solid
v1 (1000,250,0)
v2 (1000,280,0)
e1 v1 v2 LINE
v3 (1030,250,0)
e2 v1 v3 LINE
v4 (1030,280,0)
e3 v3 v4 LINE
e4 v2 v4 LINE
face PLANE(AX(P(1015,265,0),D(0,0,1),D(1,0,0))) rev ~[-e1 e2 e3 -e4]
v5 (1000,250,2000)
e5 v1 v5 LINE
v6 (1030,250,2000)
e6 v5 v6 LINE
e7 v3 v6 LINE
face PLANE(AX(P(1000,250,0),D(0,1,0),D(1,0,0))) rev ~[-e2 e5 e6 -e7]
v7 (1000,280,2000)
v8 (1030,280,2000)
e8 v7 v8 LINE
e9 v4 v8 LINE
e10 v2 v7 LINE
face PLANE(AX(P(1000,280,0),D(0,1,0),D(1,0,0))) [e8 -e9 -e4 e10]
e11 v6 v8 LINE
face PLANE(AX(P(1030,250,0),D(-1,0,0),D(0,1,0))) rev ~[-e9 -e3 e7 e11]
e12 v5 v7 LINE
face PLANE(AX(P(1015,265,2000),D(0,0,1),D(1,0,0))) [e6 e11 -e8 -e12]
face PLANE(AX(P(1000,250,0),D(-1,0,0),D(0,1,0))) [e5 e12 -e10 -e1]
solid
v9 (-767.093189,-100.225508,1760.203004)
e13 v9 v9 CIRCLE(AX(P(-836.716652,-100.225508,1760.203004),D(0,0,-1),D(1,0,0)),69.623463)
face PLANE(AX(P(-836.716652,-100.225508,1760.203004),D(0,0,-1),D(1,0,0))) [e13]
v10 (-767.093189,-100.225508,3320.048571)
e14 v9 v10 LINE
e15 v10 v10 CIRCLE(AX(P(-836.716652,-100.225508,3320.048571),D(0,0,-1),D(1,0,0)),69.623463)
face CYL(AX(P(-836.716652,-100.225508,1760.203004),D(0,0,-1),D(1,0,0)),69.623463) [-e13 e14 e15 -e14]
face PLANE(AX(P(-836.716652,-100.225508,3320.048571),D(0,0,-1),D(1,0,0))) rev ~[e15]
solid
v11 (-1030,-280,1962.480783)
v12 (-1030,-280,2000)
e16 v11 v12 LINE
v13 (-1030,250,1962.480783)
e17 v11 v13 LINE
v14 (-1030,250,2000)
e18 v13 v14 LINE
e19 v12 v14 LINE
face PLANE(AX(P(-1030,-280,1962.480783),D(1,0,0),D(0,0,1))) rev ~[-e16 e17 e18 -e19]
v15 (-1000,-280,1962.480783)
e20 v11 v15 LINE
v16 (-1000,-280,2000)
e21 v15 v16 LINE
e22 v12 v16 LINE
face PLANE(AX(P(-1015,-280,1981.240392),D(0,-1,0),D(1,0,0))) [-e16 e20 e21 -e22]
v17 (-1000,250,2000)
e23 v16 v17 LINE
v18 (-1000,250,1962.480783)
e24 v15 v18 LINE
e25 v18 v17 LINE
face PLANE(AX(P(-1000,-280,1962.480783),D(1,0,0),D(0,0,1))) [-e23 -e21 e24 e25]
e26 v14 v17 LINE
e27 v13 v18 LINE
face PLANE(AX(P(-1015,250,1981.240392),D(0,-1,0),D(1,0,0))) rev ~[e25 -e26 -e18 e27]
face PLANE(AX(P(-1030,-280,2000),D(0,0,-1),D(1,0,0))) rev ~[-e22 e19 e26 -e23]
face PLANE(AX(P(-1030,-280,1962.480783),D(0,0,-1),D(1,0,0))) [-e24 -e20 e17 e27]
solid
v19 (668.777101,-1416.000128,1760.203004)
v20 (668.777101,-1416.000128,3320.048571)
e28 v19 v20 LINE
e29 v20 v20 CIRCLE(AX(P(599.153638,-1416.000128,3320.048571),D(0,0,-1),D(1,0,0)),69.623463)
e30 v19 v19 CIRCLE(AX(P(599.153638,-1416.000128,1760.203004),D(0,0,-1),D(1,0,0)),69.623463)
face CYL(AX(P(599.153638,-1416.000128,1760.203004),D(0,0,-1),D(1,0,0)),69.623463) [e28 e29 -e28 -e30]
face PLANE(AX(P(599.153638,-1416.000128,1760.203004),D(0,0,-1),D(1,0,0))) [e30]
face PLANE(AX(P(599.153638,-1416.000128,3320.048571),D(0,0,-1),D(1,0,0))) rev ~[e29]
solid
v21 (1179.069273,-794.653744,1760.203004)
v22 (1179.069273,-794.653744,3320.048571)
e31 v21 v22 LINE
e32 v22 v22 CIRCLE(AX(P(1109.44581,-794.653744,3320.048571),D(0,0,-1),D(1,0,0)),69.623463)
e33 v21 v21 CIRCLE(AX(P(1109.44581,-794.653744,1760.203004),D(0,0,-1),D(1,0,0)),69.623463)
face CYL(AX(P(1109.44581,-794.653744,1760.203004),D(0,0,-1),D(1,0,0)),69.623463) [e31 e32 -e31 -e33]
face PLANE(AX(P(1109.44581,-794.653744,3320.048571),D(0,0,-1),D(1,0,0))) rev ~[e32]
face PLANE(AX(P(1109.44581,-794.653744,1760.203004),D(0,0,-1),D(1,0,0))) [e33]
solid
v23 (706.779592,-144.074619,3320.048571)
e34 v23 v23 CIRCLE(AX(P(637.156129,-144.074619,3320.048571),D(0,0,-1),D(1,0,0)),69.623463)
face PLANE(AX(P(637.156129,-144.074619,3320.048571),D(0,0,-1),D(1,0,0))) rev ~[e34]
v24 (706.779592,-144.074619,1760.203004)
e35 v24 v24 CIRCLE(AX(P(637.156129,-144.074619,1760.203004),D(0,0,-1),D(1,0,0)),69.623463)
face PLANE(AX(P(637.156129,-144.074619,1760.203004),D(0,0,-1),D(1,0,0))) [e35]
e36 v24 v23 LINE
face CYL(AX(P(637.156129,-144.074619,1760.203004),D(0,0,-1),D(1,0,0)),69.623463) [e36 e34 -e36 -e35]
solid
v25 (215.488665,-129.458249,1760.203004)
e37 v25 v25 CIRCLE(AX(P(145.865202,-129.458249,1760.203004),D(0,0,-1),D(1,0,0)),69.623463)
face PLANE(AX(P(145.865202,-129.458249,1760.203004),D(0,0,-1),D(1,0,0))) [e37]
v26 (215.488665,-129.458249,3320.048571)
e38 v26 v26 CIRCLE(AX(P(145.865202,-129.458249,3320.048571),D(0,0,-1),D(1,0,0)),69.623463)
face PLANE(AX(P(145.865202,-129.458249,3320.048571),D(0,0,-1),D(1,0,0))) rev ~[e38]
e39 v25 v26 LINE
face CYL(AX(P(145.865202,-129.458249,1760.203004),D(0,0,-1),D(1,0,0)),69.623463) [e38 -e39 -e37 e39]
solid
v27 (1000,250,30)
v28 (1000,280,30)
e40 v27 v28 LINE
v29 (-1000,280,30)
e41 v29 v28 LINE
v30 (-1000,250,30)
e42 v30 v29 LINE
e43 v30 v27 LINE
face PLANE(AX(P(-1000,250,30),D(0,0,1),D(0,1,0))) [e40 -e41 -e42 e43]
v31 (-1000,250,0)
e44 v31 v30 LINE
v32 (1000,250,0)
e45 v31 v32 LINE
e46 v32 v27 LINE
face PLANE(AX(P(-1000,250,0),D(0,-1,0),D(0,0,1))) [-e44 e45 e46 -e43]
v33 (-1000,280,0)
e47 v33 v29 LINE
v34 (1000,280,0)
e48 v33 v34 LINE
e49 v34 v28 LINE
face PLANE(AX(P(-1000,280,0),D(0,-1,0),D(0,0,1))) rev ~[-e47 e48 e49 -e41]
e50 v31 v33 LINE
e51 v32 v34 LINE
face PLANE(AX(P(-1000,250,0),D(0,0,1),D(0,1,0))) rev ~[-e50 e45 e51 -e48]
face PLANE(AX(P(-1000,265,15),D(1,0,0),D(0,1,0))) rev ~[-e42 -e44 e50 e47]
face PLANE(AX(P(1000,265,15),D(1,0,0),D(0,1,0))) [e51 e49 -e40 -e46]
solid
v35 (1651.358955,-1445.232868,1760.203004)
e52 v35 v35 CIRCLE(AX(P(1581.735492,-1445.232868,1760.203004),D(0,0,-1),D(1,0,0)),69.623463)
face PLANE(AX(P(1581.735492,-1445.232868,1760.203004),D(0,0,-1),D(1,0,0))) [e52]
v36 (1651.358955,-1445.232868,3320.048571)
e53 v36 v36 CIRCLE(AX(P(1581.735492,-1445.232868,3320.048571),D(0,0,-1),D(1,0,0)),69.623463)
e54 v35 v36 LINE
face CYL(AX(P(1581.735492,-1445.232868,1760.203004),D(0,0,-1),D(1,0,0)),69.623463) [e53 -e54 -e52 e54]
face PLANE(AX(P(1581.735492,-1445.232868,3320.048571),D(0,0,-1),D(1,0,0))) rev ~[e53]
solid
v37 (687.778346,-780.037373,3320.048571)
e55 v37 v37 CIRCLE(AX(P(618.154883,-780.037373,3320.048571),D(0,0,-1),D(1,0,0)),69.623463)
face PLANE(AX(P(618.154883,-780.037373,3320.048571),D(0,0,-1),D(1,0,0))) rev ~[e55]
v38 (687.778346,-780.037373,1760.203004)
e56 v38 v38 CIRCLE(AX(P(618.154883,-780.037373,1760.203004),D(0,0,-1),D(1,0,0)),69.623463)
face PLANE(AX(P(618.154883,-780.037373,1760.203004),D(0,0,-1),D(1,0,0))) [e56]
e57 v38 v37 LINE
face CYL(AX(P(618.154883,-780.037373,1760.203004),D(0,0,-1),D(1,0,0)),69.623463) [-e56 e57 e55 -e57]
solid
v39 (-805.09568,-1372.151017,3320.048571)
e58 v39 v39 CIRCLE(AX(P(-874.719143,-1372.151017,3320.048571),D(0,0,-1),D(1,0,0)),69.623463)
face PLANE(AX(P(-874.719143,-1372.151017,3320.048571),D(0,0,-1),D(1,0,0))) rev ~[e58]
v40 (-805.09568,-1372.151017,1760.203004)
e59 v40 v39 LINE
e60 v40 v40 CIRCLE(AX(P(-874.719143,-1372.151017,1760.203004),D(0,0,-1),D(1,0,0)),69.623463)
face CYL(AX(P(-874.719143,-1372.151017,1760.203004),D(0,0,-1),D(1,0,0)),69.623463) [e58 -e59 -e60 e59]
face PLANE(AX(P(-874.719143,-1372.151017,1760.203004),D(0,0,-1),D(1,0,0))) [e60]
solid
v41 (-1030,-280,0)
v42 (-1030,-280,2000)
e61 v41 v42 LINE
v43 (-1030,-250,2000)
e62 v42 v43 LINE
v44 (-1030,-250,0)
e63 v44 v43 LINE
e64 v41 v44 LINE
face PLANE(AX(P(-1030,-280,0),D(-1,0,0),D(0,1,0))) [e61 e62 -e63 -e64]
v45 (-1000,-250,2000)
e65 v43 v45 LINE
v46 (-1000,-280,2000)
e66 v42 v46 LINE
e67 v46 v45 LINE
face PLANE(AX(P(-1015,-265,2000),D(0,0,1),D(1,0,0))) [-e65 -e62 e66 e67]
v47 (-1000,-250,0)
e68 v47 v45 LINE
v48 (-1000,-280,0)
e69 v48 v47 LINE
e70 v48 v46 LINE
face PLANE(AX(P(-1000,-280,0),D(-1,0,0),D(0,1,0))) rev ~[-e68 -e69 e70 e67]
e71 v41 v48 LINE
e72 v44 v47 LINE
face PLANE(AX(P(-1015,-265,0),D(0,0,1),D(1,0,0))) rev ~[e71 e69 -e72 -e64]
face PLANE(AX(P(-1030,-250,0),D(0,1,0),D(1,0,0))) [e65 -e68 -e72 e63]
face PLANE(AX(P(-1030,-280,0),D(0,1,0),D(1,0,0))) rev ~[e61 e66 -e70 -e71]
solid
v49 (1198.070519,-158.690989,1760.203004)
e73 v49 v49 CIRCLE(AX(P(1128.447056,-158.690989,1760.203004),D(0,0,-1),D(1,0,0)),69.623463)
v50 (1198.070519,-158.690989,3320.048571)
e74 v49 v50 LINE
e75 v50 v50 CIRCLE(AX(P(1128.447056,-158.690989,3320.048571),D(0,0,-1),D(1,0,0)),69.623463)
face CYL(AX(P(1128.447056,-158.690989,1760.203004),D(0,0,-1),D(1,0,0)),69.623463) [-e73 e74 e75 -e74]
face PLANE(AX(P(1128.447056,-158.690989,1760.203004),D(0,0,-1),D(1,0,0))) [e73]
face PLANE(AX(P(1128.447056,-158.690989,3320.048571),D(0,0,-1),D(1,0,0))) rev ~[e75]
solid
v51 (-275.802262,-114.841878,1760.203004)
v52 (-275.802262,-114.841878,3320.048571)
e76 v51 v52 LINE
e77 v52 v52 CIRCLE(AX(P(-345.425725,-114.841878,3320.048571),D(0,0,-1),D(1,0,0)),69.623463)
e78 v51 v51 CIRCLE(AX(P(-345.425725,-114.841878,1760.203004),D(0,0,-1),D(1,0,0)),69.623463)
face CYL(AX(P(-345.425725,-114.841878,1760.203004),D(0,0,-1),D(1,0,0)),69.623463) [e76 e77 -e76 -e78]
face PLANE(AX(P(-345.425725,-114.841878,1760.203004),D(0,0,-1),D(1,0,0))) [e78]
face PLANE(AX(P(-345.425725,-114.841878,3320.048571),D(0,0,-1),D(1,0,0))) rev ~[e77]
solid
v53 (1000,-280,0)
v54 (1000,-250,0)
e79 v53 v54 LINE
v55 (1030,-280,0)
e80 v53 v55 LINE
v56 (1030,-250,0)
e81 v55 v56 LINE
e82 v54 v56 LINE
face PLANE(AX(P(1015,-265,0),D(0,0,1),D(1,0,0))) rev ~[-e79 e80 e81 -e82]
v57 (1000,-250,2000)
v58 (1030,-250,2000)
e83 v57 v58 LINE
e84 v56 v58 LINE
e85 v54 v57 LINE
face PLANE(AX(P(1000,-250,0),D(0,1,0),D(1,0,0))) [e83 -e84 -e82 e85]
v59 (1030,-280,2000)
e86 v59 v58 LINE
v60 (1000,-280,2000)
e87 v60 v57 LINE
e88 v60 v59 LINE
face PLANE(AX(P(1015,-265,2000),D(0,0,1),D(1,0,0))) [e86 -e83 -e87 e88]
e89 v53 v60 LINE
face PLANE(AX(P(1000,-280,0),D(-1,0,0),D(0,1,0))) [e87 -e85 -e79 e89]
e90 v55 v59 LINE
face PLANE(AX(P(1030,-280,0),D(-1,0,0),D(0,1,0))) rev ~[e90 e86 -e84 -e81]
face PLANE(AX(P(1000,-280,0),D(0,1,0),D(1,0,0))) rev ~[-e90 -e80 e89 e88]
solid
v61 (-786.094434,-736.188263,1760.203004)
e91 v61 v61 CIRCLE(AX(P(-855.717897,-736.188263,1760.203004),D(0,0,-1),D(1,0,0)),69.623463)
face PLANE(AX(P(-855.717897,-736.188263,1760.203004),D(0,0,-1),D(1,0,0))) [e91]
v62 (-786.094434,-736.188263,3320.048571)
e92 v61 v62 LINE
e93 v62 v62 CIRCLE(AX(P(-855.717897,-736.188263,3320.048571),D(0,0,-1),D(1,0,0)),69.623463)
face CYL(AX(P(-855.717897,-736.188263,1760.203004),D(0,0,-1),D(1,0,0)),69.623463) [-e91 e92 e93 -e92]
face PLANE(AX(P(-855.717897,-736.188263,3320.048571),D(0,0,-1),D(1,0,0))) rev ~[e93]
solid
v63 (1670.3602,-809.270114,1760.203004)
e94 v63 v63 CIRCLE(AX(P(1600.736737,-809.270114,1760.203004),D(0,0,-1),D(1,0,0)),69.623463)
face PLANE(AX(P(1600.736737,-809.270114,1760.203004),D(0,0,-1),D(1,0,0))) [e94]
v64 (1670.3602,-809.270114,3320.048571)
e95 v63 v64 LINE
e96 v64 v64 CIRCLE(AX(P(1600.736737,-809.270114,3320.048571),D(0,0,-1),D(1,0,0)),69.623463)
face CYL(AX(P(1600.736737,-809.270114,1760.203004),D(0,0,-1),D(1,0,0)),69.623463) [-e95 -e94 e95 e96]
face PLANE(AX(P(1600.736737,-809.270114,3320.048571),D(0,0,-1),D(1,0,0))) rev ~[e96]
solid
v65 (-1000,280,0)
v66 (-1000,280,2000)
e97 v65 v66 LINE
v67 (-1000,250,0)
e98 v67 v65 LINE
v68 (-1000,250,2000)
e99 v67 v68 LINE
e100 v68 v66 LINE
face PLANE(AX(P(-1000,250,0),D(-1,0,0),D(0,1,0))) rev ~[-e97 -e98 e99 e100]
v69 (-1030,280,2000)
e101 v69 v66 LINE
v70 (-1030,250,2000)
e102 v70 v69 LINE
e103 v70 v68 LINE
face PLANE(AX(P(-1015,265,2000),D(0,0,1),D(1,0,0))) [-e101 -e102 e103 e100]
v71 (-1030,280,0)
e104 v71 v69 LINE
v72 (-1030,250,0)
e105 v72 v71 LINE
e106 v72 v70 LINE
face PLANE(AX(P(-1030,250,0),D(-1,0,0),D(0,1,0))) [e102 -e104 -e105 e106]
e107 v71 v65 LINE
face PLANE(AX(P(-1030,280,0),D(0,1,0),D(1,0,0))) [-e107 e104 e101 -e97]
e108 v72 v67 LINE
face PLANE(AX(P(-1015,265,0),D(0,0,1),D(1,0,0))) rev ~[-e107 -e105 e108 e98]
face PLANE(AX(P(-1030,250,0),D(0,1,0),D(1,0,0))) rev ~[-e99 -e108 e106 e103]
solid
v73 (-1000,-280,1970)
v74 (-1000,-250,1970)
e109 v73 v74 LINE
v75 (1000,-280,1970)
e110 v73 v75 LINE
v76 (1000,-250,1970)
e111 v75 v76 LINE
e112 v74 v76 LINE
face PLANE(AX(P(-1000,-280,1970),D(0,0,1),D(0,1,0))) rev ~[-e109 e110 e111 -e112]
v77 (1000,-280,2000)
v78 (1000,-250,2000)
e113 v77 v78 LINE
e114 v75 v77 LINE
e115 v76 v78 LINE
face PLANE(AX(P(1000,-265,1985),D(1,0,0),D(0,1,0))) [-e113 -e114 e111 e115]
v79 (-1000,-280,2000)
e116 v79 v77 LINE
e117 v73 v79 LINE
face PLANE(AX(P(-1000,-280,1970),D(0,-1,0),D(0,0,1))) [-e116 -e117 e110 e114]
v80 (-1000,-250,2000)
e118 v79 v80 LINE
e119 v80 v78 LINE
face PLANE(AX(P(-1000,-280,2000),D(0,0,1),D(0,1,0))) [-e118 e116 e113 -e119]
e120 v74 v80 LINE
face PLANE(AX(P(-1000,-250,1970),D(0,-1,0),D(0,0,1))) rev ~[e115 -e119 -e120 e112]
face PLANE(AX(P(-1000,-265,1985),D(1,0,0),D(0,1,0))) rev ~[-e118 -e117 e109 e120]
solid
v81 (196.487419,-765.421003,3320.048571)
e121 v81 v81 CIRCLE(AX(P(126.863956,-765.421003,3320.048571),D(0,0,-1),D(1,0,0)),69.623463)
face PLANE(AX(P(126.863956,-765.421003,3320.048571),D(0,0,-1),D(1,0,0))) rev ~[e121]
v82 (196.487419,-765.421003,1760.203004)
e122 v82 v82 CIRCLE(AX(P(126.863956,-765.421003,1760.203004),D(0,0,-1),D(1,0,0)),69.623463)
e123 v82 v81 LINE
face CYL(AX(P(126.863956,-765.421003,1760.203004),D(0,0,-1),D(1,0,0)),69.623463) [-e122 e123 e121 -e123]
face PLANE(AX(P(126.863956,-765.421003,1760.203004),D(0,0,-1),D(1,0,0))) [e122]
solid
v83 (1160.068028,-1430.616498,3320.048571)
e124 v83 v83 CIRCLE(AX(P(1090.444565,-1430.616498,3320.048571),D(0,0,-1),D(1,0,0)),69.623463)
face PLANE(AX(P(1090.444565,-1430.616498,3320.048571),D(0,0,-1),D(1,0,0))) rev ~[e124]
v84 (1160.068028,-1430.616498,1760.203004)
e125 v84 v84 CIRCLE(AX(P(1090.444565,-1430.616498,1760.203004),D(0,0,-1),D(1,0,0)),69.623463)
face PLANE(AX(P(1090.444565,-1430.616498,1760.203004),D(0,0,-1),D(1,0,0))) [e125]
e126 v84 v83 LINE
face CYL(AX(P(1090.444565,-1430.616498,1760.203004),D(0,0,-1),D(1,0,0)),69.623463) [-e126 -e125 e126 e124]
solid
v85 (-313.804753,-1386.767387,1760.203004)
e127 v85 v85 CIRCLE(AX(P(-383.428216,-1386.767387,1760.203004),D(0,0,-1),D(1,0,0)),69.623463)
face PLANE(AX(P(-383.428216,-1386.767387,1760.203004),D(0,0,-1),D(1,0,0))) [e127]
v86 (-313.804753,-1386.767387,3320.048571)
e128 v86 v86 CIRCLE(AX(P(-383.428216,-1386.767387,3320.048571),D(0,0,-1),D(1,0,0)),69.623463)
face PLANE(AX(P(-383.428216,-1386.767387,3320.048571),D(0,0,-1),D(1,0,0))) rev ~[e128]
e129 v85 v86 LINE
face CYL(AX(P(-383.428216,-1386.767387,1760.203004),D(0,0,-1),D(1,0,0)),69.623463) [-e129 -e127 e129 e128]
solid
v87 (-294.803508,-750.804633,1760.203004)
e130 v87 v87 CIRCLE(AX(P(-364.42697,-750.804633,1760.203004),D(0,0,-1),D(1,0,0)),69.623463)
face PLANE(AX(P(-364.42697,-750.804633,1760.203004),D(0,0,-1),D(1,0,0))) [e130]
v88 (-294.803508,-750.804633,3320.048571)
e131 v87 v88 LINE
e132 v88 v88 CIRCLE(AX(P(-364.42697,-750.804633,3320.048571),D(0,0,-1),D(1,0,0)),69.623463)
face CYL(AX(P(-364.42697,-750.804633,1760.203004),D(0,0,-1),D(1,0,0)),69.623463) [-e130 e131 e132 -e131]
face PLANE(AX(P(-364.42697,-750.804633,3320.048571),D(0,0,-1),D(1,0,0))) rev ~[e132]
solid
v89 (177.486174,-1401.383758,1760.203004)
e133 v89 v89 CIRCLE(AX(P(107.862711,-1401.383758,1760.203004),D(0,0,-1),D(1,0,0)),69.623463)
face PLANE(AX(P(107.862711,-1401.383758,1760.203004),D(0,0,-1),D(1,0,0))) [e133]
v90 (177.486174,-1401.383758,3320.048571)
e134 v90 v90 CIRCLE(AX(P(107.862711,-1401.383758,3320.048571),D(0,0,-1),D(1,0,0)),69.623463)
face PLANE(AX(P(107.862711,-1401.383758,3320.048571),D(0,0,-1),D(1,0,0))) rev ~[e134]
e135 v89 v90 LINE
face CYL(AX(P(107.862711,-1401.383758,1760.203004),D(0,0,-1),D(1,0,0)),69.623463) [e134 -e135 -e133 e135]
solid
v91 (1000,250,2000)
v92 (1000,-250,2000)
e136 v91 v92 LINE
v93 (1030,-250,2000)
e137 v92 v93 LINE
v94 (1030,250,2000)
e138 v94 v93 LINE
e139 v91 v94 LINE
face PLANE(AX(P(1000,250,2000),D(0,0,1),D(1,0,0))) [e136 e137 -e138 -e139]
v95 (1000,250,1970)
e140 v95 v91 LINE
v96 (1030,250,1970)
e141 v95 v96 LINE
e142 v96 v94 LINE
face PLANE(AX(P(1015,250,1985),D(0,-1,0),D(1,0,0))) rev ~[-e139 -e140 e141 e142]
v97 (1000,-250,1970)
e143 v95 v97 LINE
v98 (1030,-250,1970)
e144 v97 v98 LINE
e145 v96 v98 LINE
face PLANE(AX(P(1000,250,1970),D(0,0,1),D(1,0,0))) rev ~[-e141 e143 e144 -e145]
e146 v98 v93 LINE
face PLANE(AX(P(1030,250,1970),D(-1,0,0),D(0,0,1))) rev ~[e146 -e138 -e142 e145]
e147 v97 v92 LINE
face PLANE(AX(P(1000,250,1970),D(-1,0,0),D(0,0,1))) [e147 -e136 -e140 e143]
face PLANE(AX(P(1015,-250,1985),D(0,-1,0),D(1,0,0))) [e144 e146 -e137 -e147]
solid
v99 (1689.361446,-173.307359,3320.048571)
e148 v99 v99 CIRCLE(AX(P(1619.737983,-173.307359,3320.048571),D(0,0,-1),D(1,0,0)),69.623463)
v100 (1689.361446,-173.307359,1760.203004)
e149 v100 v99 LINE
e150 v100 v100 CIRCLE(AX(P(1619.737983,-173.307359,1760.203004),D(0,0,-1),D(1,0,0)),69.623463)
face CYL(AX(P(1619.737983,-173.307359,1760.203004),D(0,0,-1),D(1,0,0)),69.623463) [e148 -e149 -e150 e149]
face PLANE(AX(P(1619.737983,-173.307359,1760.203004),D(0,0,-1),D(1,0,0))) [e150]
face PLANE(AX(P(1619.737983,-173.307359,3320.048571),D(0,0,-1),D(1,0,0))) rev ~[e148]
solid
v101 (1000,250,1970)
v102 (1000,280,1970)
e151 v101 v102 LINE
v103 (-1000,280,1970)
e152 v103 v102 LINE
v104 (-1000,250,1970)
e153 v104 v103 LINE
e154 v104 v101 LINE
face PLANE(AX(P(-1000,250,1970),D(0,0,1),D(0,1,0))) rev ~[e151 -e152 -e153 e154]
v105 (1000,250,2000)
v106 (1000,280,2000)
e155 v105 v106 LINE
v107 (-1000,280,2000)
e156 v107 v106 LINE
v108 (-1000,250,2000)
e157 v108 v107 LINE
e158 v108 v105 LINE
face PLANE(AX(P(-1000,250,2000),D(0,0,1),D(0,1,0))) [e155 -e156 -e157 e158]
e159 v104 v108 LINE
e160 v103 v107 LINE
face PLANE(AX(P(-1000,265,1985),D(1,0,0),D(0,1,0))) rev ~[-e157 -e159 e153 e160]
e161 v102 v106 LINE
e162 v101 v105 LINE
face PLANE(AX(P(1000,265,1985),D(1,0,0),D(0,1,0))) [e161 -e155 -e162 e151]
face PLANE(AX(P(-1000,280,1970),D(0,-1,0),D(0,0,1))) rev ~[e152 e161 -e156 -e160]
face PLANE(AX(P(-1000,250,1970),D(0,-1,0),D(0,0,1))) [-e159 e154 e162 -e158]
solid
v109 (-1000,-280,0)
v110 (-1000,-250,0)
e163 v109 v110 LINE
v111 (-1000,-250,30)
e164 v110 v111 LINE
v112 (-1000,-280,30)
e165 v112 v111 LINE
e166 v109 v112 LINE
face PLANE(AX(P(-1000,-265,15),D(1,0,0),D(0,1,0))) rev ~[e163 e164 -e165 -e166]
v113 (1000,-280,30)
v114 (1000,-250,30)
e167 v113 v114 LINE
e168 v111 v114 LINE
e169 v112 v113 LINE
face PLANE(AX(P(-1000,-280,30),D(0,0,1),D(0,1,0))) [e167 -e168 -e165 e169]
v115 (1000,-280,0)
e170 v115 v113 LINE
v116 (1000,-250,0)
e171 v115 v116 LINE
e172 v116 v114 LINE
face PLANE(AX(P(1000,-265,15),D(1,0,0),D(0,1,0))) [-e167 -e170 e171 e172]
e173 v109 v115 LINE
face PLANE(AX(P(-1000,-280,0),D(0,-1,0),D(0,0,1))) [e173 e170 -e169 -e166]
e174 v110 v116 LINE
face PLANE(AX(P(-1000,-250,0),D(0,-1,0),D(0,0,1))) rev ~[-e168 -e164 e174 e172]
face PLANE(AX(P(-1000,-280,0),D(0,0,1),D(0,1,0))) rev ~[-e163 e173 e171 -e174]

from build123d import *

# Parameters (mm, degrees)
F0_W      = 30
F0_H      = 30
F1_DEPTH  = 2000
F2_W      = 30
F2_H      = 30
F3_DEPTH  = 2000
F4_W      = 30
F4_H      = 30
F5_DEPTH  = 2000
F6_W      = 30
F6_H      = 37.5192165375
F7_DEPTH  = 530
F8_W      = 30
F8_H      = 30
F9_DEPTH  = 500
F12_R     = 69.6234629817
F13_DEPTH = 1559.8455667496


with BuildPart() as f1:
    # F0 (on Top) → F1 (new body)
    with BuildSketch(Plane.XY):
        with Locations((-1015, 265)):
            Rectangle(F0_W, F0_H)
    extrude(amount=F1_DEPTH)


with BuildPart() as f1b:
    # F0 (on Top) → F1, piece 2 (new body)
    with BuildSketch(Plane.XY):
        with Locations((1015, 265)):
            Rectangle(F0_W, F0_H)
    extrude(amount=F1_DEPTH)


with BuildPart() as f1c:
    # F0 (on Top) → F1, piece 3 (new body)
    with BuildSketch(Plane.XY):
        with Locations((-1015, -265)):
            Rectangle(F0_W, F0_H)
    extrude(amount=F1_DEPTH)


with BuildPart() as f1d:
    # F0 (on Top) → F1, piece 4 (new body)
    with BuildSketch(Plane.XY):
        with Locations((1015, -265)):
            Rectangle(F0_W, F0_H)
    extrude(amount=F1_DEPTH)


with BuildPart() as f3:
    # F2 (on face) → F3 (new body, through all)
    with BuildSketch(Plane.YZ.offset(-1000)):
        with Locations((265, 15)):
            Rectangle(F2_W, F2_H)
    extrude(amount=F3_DEPTH)


with BuildPart() as f3b:
    # F2 (on face) → F3, piece 2 (new body, through all)
    with BuildSketch(Plane.YZ.offset(-1000)):
        with Locations((-265, 15)):
            Rectangle(F2_W, F2_H)
    extrude(amount=F3_DEPTH)


with BuildPart() as f5:
    # F4 (on face) → F5 (new body, through all)
    with BuildSketch(Plane.YZ.offset(-1000)):
        with Locations((-265, 1985)):
            Rectangle(F4_W, F4_H)
    extrude(amount=F5_DEPTH)


with BuildPart() as f5b:
    # F4 (on face) → F5, piece 2 (new body, through all)
    with BuildSketch(Plane.YZ.offset(-1000)):
        with Locations((265, 1985)):
            Rectangle(F4_W, F4_H)
    extrude(amount=F5_DEPTH)


with BuildPart() as f7:
    # F6 (on face) → F7 (new body, through all)
    with BuildSketch(Plane.XZ.offset(280)):
        with Locations((-1015, 1981.2403917313)):
            Rectangle(F6_W, F6_H)
    extrude(amount=-F7_DEPTH)


with BuildPart() as f9:
    # F8 (on face) → F9 (new body)
    with BuildSketch(Plane.XZ.offset(-250)):
        with Locations((1015, 1985)):
            Rectangle(F8_W, F8_H)
    extrude(amount=F9_DEPTH)


with BuildPart() as f13:
    # F12 (on face) → F13 (new body)
    with BuildSketch(Plane(origin=(0, 0, 1760.2030038834), x_dir=(1, 0, 0), z_dir=(0, 0, -1))):
        with Locations((-836.7166519165, 100.225508213)):
            Circle(F12_R)
    extrude(amount=-F13_DEPTH)


with BuildPart() as f13b:
    # F12 (on face) → F13, piece 2 (new body)
    with BuildSketch(Plane(origin=(0, 0, 1760.2030038834), x_dir=(1, 0, 0), z_dir=(0, 0, -1))):
        with Locations((-855.7178974152, 736.188262701)):
            Circle(F12_R)
    extrude(amount=-F13_DEPTH)


with BuildPart() as f13c:
    # F12 (on face) → F13, piece 3 (new body)
    with BuildSketch(Plane(origin=(0, 0, 1760.2030038834), x_dir=(1, 0, 0), z_dir=(0, 0, -1))):
        with Locations((-345.4257249832, 114.8418784142)):
            Circle(F12_R)
    extrude(amount=-F13_DEPTH)


with BuildPart() as f13d:
    # F12 (on face) → F13, piece 4 (new body)
    with BuildSketch(Plane(origin=(0, 0, 1760.2030038834), x_dir=(1, 0, 0), z_dir=(0, 0, -1))):
        with Locations((-364.4269704819, 750.8046329021)):
            Circle(F12_R)
    extrude(amount=-F13_DEPTH)


with BuildPart() as f13e:
    # F12 (on face) → F13, piece 5 (new body)
    with BuildSketch(Plane(origin=(0, 0, 1760.2030038834), x_dir=(1, 0, 0), z_dir=(0, 0, -1))):
        with Locations((145.8652019501, 129.4582486153)):
            Circle(F12_R)
    extrude(amount=-F13_DEPTH)


with BuildPart() as f13f:
    # F12 (on face) → F13, piece 6 (new body)
    with BuildSketch(Plane(origin=(0, 0, 1760.2030038834), x_dir=(1, 0, 0), z_dir=(0, 0, -1))):
        with Locations((126.8639564514, 765.4210031033)):
            Circle(F12_R)
    extrude(amount=-F13_DEPTH)


with BuildPart() as f13g:
    # F12 (on face) → F13, piece 7 (new body)
    with BuildSketch(Plane(origin=(0, 0, 1760.2030038834), x_dir=(1, 0, 0), z_dir=(0, 0, -1))):
        with Locations((-874.7191429138, 1372.151017189)):
            Circle(F12_R)
    extrude(amount=-F13_DEPTH)


with BuildPart() as f13h:
    # F12 (on face) → F13, piece 8 (new body)
    with BuildSketch(Plane(origin=(0, 0, 1760.2030038834), x_dir=(1, 0, 0), z_dir=(0, 0, -1))):
        with Locations((-383.4282159805, 1386.7673873901)):
            Circle(F12_R)
    extrude(amount=-F13_DEPTH)


with BuildPart() as f13i:
    # F12 (on face) → F13, piece 9 (new body)
    with BuildSketch(Plane(origin=(0, 0, 1760.2030038834), x_dir=(1, 0, 0), z_dir=(0, 0, -1))):
        with Locations((107.8627109528, 1401.3837575912)):
            Circle(F12_R)
    extrude(amount=-F13_DEPTH)


with BuildPart() as f13j:
    # F12 (on face) → F13, piece 10 (new body)
    with BuildSketch(Plane(origin=(0, 0, 1760.2030038834), x_dir=(1, 0, 0), z_dir=(0, 0, -1))):
        with Locations((637.1561288834, 144.0746188164)):
            Circle(F12_R)
    extrude(amount=-F13_DEPTH)


with BuildPart() as f13k:
    # F12 (on face) → F13, piece 11 (new body)
    with BuildSketch(Plane(origin=(0, 0, 1760.2030038834), x_dir=(1, 0, 0), z_dir=(0, 0, -1))):
        with Locations((618.1548833847, 780.0373733044)):
            Circle(F12_R)
    extrude(amount=-F13_DEPTH)


with BuildPart() as f13l:
    # F12 (on face) → F13, piece 12 (new body)
    with BuildSketch(Plane(origin=(0, 0, 1760.2030038834), x_dir=(1, 0, 0), z_dir=(0, 0, -1))):
        with Locations((599.153637886, 1416.0001277924)):
            Circle(F12_R)
    extrude(amount=-F13_DEPTH)


with BuildPart() as f13m:
    # F12 (on face) → F13, piece 13 (new body)
    with BuildSketch(Plane(origin=(0, 0, 1760.2030038834), x_dir=(1, 0, 0), z_dir=(0, 0, -1))):
        with Locations((1128.4470558167, 158.6909890175)):
            Circle(F12_R)
    extrude(amount=-F13_DEPTH)


with BuildPart() as f13n:
    # F12 (on face) → F13, piece 14 (new body)
    with BuildSketch(Plane(origin=(0, 0, 1760.2030038834), x_dir=(1, 0, 0), z_dir=(0, 0, -1))):
        with Locations((1109.445810318, 794.6537435055)):
            Circle(F12_R)
    extrude(amount=-F13_DEPTH)


with BuildPart() as f13o:
    # F12 (on face) → F13, piece 15 (new body)
    with BuildSketch(Plane(origin=(0, 0, 1760.2030038834), x_dir=(1, 0, 0), z_dir=(0, 0, -1))):
        with Locations((1090.4445648193, 1430.6164979935)):
            Circle(F12_R)
    extrude(amount=-F13_DEPTH)


with BuildPart() as f13p:
    # F12 (on face) → F13, piece 16 (new body)
    with BuildSketch(Plane(origin=(0, 0, 1760.2030038834), x_dir=(1, 0, 0), z_dir=(0, 0, -1))):
        with Locations((1619.7379827499, 173.3073592186)):
            Circle(F12_R)
    extrude(amount=-F13_DEPTH)


with BuildPart() as f13q:
    # F12 (on face) → F13, piece 17 (new body)
    with BuildSketch(Plane(origin=(0, 0, 1760.2030038834), x_dir=(1, 0, 0), z_dir=(0, 0, -1))):
        with Locations((1600.7367372513, 809.2701137066)):
            Circle(F12_R)
    extrude(amount=-F13_DEPTH)


with BuildPart() as f13r:
    # F12 (on face) → F13, piece 18 (new body)
    with BuildSketch(Plane(origin=(0, 0, 1760.2030038834), x_dir=(1, 0, 0), z_dir=(0, 0, -1))):
        with Locations((1581.7354917526, 1445.2328681946)):
            Circle(F12_R)
    extrude(amount=-F13_DEPTH)


solid = Compound([f1.part, f1b.part, f1c.part, f1d.part, f3.part, f3b.part, f5.part, f5b.part, f7.part, f9.part, f13.part, f13b.part, f13c.part, f13d.part, f13e.part, f13f.part, f13g.part, f13h.part, f13i.part, f13j.part, f13k.part, f13l.part, f13m.part, f13n.part, f13o.part, f13p.part, f13q.part, f13r.part])
